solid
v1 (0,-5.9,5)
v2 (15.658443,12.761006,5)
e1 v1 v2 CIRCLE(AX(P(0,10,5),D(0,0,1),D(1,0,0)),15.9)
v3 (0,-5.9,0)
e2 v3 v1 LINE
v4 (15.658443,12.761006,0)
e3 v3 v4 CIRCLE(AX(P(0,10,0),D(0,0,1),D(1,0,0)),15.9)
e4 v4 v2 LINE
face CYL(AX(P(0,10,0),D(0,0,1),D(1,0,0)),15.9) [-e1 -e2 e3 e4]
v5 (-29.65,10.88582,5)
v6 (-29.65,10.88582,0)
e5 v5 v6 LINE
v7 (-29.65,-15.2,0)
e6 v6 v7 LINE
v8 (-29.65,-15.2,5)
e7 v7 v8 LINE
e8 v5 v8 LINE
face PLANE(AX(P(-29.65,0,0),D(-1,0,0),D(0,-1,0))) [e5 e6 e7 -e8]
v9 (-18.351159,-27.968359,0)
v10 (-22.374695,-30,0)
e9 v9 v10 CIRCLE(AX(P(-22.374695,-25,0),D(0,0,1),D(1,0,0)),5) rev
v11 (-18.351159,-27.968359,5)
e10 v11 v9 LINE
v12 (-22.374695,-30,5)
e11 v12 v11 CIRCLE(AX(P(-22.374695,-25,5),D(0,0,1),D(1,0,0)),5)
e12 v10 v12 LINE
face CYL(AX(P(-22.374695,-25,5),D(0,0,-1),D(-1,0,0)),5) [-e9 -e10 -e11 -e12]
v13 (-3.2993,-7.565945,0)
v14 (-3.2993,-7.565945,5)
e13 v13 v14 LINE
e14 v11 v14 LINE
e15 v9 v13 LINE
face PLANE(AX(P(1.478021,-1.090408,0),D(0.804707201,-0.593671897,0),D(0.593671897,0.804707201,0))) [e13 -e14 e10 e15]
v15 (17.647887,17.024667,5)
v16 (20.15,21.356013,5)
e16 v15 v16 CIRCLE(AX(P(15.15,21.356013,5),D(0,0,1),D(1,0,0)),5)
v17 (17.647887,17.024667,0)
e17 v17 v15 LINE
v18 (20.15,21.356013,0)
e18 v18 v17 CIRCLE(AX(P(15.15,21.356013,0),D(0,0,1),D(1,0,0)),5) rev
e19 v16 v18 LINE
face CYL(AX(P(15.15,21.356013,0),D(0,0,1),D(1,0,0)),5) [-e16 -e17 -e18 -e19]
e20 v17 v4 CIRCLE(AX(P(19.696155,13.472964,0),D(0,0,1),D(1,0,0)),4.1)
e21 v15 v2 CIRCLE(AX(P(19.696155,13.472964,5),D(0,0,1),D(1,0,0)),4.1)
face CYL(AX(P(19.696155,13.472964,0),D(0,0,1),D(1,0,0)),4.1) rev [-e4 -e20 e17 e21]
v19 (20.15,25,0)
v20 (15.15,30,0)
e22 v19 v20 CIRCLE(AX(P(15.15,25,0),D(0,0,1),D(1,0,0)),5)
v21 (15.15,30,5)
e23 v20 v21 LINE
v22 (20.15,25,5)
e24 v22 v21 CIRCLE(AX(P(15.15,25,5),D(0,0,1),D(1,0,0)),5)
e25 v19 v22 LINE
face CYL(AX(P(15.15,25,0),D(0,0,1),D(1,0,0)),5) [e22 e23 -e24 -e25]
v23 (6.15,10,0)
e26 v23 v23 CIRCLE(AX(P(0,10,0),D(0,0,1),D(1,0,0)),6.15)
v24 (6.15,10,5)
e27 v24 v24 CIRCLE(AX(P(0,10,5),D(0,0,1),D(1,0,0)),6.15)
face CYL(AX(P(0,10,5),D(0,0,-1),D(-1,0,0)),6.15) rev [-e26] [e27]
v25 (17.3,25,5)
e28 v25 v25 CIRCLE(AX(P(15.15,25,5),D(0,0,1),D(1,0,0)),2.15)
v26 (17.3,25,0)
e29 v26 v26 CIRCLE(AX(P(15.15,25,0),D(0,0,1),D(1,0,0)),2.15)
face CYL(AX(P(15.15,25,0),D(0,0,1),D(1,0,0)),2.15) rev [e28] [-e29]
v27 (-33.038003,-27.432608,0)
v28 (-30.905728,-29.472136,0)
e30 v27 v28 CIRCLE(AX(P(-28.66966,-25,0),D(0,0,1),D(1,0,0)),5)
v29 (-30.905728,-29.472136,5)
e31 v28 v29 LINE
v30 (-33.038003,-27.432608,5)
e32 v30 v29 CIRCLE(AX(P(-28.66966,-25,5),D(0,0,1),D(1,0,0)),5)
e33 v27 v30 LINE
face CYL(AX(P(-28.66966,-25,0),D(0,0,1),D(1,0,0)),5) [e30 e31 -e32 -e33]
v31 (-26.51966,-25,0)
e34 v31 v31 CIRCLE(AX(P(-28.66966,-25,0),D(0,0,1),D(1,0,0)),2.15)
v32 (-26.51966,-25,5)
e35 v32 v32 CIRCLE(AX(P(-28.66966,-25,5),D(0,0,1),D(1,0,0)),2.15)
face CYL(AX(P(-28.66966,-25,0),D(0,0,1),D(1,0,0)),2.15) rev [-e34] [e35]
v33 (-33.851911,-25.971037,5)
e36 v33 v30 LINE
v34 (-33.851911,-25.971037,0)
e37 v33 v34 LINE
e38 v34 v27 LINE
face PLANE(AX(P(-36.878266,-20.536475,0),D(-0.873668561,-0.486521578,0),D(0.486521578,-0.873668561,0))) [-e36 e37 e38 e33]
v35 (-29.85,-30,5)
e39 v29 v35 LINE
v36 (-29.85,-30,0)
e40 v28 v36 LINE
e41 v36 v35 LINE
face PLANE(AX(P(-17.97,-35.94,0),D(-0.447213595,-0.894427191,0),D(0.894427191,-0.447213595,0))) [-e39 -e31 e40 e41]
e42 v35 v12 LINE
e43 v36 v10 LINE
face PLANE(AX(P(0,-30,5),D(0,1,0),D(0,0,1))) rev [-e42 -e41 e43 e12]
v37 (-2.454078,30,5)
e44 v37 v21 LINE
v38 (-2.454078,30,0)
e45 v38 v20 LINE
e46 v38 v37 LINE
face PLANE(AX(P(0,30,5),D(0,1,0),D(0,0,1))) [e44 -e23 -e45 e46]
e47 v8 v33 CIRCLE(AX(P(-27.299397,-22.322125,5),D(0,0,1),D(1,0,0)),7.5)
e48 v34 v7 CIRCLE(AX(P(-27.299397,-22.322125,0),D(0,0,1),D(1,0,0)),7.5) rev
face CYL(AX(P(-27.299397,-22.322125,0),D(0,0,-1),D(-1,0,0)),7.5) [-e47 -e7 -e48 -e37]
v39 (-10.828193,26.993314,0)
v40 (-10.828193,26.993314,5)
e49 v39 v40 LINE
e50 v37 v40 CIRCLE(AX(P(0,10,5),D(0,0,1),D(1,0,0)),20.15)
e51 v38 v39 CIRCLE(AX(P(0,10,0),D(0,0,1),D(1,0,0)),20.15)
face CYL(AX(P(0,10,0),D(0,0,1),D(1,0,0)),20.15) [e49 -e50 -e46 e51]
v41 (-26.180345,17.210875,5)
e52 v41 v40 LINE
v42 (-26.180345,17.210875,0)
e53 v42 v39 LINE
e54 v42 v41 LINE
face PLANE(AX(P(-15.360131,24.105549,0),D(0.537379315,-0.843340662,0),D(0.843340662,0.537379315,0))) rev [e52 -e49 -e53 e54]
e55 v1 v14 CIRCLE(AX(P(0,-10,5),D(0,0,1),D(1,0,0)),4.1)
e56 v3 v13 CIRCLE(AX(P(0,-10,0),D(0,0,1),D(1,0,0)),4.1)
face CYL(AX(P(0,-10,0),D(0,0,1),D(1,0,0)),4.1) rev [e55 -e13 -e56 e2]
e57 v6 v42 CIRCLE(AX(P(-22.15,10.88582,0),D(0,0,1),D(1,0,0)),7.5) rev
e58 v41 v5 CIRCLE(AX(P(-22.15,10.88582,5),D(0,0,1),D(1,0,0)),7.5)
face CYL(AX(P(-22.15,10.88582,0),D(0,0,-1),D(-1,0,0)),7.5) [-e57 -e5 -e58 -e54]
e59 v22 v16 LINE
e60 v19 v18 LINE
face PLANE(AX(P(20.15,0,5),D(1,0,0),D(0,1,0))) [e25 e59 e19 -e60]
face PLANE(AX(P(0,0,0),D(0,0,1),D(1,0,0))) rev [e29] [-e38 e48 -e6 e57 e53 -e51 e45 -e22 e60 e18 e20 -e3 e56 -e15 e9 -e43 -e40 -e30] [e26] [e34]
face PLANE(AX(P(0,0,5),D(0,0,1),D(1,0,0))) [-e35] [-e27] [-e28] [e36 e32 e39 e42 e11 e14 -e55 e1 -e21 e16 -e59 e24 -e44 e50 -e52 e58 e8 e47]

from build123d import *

# Parameters (mm, degrees)
SKETCH_1_W          = 80
SKETCH_1_H          = 60
SKETCH_1_R          = 6.15
EXTRUDE_1_DEPTH     = 5
SKETCH_2_R          = 2.15
CUT_EXTRUDE_1_DEPTH = 68.134361545
SKETCH_3_R          = 2.15
CUT_EXTRUDE_2_DEPTH = 68.134361545
CUT_EXTRUDE_3_DEPTH = 68.134361545
SKETCH_6_R          = 2.15
CUT_EXTRUDE_5_DEPTH = 68.134361545
CUT_EXTRUDE_7_DEPTH = 68.134361545
FILLET_1_R          = 7.5
CUT_EXTRUDE_8_DEPTH = 47.216858546
FILLET_2_R          = 5
FILLET_3_R          = 5


with BuildPart() as part:
    # ｽｹｯﾁ1 → ﾎﾞｽ - 押し出し1 (new body)
    with BuildSketch(Plane.XY):
        with Locations((-19.85, 0)):
            Rectangle(SKETCH_1_W, SKETCH_1_H)
        with Locations((0, 10)):
            Circle(SKETCH_1_R, mode=Mode.SUBTRACT)
    extrude(amount=EXTRUDE_1_DEPTH)

    # ｽｹｯﾁ2 → ｶｯﾄ - 押し出し1 (cut, through all)
    with BuildSketch(Plane.XY.offset(5)):
        with Locations((-54.85, 10)):
            Circle(SKETCH_2_R)
        with Locations(Location((-54.85, -10, 0), (0, 0, 180))):
            Circle(SKETCH_2_R)
        with Locations((-34.85, 10)):
            Circle(SKETCH_2_R)
        with Locations(Location((-34.85, -10, 0), (0, 0, 180))):
            Circle(SKETCH_2_R)
    extrude(amount=-CUT_EXTRUDE_1_DEPTH, mode=Mode.SUBTRACT)

    # ｽｹｯﾁ3 → ｶｯﾄ - 押し出し2 (cut, through all)
    with BuildSketch(Plane.XY.offset(5)):
        with Locations((15.15, 25)):
            Circle(SKETCH_3_R)
        with BuildLine():
            ThreePointArc((15.15, 30), (18.685533906, 28.535533906), (20.15, 25))
            Line((20.15, 25), (20.15, 30))
            Line((20.15, 30), (15.15, 30))
        make_face()
    extrude(amount=-CUT_EXTRUDE_2_DEPTH, mode=Mode.SUBTRACT)

    # ｽｹｯﾁ4 → ｶｯﾄ - 押し出し3 (cut, through all)
    with BuildSketch(Plane.XY.offset(5)):
        Polygon((-59.85, 30), (-59.85, 15), (-29.85, 30), align=None)
        Polygon((-29.85, -30), (-59.85, -15), (-59.85, -30), align=None)
        with BuildLine():
            Line((20.15, 0), (17.493498792, 0))
            ThreePointArc((17.493498792, 0), (15.094907291, -3.347893986), (12.06572435, -6.138178209))
            Line((12.06572435, -6.138178209), (-19.85, -30))
            Line((-19.85, -30), (20.15, -30))
            Line((20.15, -30), (20.15, 0))
        make_face()
        with BuildLine():
            ThreePointArc((20.15, 10), (19.474553919, 4.8265824), (17.493498792, 0))
            Line((17.493498792, 0), (20.15, 0))
            Line((20.15, 0), (20.15, 10))
        make_face()
    extrude(amount=-CUT_EXTRUDE_3_DEPTH, mode=Mode.SUBTRACT)

    # ｽｹｯﾁ6 → ｶｯﾄ - 押し出し5 (cut, through all)
    with BuildSketch(Plane.XY.offset(5)):
        with Locations((-28.669660113, -25)):
            Circle(SKETCH_6_R)
    extrude(amount=-CUT_EXTRUDE_5_DEPTH, mode=Mode.SUBTRACT)

    # ｽｹｯﾁ7 → ｶｯﾄ - 押し出し7 (cut, through all)
    with BuildSketch(Plane.XY.offset(5)):
        with BuildLine():
            Line((-33.038002917, -27.432607888), (-39.85, -15.2))
            Line((-39.85, -15.2), (-29.65, -15.2))
            Line((-29.65, -15.2), (-29.65, 15))
            Line((-29.65, 15), (-10.828193198, 26.993314334))
            ThreePointArc((-10.828193198, 26.993314334), (-6.809164655, 28.964645441), (-2.454078238, 30))
            Line((-2.454078238, 30), (-29.85, 30))
            Line((-29.85, 30), (-59.85, 15))
            Line((-59.85, 15), (-59.85, -15))
            Line((-59.85, -15), (-30.90572732, -29.47213634))
            ThreePointArc((-30.90572732, -29.47213634), (-32.125738379, -28.613242729), (-33.038002917, -27.432607888))
        make_face()
    extrude(amount=-CUT_EXTRUDE_7_DEPTH, mode=Mode.SUBTRACT)

    # ﾌｨﾚｯﾄ1
    # the kernel refuses this fillet: 7.5 mm, written as the material it takes off along each edge
    with BuildSketch(Plane(origin=(-39.85, -15.2, 35.821289963), x_dir=(1, 0, 0), z_dir=(0, 0, -1))) as fillet_1_piece_1:
        with BuildLine():
            CenterArc((12.550603255, 7.122124988), FILLET_1_R, 150.887789783, 100.847129313)
            Line((5.998089047, 10.77103682), (5.867038763, 10.844015057))
            Line((5.867038763, 10.844015057), (-0.131050284, 0.072978237))
            Line((-0.131050284, 0.072978237), (0, -0.15))
            ThreePointArc((0, -0.15), (5.1, -0.15), (10.152987935, -0.1424425))
            Line((10.152987935, -0.1424425), (10.2, 0))
        make_face()
    extrude(amount=66.642579926, mode=Mode.SUBTRACT)
    with BuildSketch(Plane(origin=(-29.65, 15, 15.285449565), x_dir=(0.8433406617465673, 0.5373793150511676, 0), z_dir=(0, 0, -1))) as fillet_1_piece_2:
        with BuildLine():
            CenterArc((FILLET_1_R * 0.548557310151, FILLET_1_R), FILLET_1_R, 212.505415036, 57.494584964)
            Line((-FILLET_1_R * 0.294783351595, FILLET_1_R * 0.462620684949), (-FILLET_1_R * 0.31165016483, FILLET_1_R * 0.451873098648))
            Line((-FILLET_1_R * 0.31165016483, FILLET_1_R * 0.451873098648), (-FILLET_1_R * 0.010971146203, -FILLET_1_R * 0.02))
            Line((-FILLET_1_R * 0.010971146203, -FILLET_1_R * 0.02), (FILLET_1_R * 0.548557310151, -FILLET_1_R * 0.02))
            Line((FILLET_1_R * 0.548557310151, -FILLET_1_R * 0.02), (FILLET_1_R * 0.548557310151, 0))
        make_face()
    extrude(amount=25.570899131, mode=Mode.SUBTRACT)

    # ｽｹｯﾁ8 → ｶｯﾄ - 押し出し8 (cut, through all)
    with BuildSketch(Plane.XY.offset(5)):
        with BuildLine():
            Line((-3.299299523, -7.565945223), (-19.85, -30))
            Line((-19.85, -30), (1.477219454, -14.054684007))
            ThreePointArc((1.477219454, -14.054684007), (0.73895718, -14.088668338), (0, -14.1))
            ThreePointArc((0, -14.1), (-3.659892388, -11.848022648), (-3.299299523, -7.565945223))
        make_face()
        with BuildLine():
            ThreePointArc((0, -5.9), (-1.848022648, -6.340107612), (-3.299299523, -7.565945223))
            ThreePointArc((-3.299299523, -7.565945223), (-3.659892388, -11.848022648), (0, -14.1))
            ThreePointArc((0, -14.1), (0.73895718, -14.088668338), (1.477219454, -14.054684007))
            Line((1.477219454, -14.054684007), (12.06572435, -6.138178209))
            ThreePointArc((12.06572435, -6.138178209), (18.015921371, 0.975085753), (20.15, 10))
            Line((20.15, 10), (20.15, 17.547767201))
            ThreePointArc((20.15, 17.547767201), (16.706289505, 16.278441046), (15.658443273, 12.761006025))
            ThreePointArc((15.658443273, 12.761006025), (12.180106646, -0.220322994), (0, -5.9))
        make_face()
    extrude(amount=-CUT_EXTRUDE_8_DEPTH, mode=Mode.SUBTRACT)

    # ﾌｨﾚｯﾄ2
    fillet_2_edges = [part.edges().sort_by_distance(p)[0] for p in [
        (-19.85, -30, 2.5),
    ]]
    fillet(fillet_2_edges, radius=FILLET_2_R)

    # ﾌｨﾚｯﾄ3
    fillet_3_edges = [part.edges().sort_by_distance(p)[0] for p in [
        (20.15, 17.547767201, 2.5),
    ]]
    fillet(fillet_3_edges, radius=FILLET_3_R)


solid = part.part
